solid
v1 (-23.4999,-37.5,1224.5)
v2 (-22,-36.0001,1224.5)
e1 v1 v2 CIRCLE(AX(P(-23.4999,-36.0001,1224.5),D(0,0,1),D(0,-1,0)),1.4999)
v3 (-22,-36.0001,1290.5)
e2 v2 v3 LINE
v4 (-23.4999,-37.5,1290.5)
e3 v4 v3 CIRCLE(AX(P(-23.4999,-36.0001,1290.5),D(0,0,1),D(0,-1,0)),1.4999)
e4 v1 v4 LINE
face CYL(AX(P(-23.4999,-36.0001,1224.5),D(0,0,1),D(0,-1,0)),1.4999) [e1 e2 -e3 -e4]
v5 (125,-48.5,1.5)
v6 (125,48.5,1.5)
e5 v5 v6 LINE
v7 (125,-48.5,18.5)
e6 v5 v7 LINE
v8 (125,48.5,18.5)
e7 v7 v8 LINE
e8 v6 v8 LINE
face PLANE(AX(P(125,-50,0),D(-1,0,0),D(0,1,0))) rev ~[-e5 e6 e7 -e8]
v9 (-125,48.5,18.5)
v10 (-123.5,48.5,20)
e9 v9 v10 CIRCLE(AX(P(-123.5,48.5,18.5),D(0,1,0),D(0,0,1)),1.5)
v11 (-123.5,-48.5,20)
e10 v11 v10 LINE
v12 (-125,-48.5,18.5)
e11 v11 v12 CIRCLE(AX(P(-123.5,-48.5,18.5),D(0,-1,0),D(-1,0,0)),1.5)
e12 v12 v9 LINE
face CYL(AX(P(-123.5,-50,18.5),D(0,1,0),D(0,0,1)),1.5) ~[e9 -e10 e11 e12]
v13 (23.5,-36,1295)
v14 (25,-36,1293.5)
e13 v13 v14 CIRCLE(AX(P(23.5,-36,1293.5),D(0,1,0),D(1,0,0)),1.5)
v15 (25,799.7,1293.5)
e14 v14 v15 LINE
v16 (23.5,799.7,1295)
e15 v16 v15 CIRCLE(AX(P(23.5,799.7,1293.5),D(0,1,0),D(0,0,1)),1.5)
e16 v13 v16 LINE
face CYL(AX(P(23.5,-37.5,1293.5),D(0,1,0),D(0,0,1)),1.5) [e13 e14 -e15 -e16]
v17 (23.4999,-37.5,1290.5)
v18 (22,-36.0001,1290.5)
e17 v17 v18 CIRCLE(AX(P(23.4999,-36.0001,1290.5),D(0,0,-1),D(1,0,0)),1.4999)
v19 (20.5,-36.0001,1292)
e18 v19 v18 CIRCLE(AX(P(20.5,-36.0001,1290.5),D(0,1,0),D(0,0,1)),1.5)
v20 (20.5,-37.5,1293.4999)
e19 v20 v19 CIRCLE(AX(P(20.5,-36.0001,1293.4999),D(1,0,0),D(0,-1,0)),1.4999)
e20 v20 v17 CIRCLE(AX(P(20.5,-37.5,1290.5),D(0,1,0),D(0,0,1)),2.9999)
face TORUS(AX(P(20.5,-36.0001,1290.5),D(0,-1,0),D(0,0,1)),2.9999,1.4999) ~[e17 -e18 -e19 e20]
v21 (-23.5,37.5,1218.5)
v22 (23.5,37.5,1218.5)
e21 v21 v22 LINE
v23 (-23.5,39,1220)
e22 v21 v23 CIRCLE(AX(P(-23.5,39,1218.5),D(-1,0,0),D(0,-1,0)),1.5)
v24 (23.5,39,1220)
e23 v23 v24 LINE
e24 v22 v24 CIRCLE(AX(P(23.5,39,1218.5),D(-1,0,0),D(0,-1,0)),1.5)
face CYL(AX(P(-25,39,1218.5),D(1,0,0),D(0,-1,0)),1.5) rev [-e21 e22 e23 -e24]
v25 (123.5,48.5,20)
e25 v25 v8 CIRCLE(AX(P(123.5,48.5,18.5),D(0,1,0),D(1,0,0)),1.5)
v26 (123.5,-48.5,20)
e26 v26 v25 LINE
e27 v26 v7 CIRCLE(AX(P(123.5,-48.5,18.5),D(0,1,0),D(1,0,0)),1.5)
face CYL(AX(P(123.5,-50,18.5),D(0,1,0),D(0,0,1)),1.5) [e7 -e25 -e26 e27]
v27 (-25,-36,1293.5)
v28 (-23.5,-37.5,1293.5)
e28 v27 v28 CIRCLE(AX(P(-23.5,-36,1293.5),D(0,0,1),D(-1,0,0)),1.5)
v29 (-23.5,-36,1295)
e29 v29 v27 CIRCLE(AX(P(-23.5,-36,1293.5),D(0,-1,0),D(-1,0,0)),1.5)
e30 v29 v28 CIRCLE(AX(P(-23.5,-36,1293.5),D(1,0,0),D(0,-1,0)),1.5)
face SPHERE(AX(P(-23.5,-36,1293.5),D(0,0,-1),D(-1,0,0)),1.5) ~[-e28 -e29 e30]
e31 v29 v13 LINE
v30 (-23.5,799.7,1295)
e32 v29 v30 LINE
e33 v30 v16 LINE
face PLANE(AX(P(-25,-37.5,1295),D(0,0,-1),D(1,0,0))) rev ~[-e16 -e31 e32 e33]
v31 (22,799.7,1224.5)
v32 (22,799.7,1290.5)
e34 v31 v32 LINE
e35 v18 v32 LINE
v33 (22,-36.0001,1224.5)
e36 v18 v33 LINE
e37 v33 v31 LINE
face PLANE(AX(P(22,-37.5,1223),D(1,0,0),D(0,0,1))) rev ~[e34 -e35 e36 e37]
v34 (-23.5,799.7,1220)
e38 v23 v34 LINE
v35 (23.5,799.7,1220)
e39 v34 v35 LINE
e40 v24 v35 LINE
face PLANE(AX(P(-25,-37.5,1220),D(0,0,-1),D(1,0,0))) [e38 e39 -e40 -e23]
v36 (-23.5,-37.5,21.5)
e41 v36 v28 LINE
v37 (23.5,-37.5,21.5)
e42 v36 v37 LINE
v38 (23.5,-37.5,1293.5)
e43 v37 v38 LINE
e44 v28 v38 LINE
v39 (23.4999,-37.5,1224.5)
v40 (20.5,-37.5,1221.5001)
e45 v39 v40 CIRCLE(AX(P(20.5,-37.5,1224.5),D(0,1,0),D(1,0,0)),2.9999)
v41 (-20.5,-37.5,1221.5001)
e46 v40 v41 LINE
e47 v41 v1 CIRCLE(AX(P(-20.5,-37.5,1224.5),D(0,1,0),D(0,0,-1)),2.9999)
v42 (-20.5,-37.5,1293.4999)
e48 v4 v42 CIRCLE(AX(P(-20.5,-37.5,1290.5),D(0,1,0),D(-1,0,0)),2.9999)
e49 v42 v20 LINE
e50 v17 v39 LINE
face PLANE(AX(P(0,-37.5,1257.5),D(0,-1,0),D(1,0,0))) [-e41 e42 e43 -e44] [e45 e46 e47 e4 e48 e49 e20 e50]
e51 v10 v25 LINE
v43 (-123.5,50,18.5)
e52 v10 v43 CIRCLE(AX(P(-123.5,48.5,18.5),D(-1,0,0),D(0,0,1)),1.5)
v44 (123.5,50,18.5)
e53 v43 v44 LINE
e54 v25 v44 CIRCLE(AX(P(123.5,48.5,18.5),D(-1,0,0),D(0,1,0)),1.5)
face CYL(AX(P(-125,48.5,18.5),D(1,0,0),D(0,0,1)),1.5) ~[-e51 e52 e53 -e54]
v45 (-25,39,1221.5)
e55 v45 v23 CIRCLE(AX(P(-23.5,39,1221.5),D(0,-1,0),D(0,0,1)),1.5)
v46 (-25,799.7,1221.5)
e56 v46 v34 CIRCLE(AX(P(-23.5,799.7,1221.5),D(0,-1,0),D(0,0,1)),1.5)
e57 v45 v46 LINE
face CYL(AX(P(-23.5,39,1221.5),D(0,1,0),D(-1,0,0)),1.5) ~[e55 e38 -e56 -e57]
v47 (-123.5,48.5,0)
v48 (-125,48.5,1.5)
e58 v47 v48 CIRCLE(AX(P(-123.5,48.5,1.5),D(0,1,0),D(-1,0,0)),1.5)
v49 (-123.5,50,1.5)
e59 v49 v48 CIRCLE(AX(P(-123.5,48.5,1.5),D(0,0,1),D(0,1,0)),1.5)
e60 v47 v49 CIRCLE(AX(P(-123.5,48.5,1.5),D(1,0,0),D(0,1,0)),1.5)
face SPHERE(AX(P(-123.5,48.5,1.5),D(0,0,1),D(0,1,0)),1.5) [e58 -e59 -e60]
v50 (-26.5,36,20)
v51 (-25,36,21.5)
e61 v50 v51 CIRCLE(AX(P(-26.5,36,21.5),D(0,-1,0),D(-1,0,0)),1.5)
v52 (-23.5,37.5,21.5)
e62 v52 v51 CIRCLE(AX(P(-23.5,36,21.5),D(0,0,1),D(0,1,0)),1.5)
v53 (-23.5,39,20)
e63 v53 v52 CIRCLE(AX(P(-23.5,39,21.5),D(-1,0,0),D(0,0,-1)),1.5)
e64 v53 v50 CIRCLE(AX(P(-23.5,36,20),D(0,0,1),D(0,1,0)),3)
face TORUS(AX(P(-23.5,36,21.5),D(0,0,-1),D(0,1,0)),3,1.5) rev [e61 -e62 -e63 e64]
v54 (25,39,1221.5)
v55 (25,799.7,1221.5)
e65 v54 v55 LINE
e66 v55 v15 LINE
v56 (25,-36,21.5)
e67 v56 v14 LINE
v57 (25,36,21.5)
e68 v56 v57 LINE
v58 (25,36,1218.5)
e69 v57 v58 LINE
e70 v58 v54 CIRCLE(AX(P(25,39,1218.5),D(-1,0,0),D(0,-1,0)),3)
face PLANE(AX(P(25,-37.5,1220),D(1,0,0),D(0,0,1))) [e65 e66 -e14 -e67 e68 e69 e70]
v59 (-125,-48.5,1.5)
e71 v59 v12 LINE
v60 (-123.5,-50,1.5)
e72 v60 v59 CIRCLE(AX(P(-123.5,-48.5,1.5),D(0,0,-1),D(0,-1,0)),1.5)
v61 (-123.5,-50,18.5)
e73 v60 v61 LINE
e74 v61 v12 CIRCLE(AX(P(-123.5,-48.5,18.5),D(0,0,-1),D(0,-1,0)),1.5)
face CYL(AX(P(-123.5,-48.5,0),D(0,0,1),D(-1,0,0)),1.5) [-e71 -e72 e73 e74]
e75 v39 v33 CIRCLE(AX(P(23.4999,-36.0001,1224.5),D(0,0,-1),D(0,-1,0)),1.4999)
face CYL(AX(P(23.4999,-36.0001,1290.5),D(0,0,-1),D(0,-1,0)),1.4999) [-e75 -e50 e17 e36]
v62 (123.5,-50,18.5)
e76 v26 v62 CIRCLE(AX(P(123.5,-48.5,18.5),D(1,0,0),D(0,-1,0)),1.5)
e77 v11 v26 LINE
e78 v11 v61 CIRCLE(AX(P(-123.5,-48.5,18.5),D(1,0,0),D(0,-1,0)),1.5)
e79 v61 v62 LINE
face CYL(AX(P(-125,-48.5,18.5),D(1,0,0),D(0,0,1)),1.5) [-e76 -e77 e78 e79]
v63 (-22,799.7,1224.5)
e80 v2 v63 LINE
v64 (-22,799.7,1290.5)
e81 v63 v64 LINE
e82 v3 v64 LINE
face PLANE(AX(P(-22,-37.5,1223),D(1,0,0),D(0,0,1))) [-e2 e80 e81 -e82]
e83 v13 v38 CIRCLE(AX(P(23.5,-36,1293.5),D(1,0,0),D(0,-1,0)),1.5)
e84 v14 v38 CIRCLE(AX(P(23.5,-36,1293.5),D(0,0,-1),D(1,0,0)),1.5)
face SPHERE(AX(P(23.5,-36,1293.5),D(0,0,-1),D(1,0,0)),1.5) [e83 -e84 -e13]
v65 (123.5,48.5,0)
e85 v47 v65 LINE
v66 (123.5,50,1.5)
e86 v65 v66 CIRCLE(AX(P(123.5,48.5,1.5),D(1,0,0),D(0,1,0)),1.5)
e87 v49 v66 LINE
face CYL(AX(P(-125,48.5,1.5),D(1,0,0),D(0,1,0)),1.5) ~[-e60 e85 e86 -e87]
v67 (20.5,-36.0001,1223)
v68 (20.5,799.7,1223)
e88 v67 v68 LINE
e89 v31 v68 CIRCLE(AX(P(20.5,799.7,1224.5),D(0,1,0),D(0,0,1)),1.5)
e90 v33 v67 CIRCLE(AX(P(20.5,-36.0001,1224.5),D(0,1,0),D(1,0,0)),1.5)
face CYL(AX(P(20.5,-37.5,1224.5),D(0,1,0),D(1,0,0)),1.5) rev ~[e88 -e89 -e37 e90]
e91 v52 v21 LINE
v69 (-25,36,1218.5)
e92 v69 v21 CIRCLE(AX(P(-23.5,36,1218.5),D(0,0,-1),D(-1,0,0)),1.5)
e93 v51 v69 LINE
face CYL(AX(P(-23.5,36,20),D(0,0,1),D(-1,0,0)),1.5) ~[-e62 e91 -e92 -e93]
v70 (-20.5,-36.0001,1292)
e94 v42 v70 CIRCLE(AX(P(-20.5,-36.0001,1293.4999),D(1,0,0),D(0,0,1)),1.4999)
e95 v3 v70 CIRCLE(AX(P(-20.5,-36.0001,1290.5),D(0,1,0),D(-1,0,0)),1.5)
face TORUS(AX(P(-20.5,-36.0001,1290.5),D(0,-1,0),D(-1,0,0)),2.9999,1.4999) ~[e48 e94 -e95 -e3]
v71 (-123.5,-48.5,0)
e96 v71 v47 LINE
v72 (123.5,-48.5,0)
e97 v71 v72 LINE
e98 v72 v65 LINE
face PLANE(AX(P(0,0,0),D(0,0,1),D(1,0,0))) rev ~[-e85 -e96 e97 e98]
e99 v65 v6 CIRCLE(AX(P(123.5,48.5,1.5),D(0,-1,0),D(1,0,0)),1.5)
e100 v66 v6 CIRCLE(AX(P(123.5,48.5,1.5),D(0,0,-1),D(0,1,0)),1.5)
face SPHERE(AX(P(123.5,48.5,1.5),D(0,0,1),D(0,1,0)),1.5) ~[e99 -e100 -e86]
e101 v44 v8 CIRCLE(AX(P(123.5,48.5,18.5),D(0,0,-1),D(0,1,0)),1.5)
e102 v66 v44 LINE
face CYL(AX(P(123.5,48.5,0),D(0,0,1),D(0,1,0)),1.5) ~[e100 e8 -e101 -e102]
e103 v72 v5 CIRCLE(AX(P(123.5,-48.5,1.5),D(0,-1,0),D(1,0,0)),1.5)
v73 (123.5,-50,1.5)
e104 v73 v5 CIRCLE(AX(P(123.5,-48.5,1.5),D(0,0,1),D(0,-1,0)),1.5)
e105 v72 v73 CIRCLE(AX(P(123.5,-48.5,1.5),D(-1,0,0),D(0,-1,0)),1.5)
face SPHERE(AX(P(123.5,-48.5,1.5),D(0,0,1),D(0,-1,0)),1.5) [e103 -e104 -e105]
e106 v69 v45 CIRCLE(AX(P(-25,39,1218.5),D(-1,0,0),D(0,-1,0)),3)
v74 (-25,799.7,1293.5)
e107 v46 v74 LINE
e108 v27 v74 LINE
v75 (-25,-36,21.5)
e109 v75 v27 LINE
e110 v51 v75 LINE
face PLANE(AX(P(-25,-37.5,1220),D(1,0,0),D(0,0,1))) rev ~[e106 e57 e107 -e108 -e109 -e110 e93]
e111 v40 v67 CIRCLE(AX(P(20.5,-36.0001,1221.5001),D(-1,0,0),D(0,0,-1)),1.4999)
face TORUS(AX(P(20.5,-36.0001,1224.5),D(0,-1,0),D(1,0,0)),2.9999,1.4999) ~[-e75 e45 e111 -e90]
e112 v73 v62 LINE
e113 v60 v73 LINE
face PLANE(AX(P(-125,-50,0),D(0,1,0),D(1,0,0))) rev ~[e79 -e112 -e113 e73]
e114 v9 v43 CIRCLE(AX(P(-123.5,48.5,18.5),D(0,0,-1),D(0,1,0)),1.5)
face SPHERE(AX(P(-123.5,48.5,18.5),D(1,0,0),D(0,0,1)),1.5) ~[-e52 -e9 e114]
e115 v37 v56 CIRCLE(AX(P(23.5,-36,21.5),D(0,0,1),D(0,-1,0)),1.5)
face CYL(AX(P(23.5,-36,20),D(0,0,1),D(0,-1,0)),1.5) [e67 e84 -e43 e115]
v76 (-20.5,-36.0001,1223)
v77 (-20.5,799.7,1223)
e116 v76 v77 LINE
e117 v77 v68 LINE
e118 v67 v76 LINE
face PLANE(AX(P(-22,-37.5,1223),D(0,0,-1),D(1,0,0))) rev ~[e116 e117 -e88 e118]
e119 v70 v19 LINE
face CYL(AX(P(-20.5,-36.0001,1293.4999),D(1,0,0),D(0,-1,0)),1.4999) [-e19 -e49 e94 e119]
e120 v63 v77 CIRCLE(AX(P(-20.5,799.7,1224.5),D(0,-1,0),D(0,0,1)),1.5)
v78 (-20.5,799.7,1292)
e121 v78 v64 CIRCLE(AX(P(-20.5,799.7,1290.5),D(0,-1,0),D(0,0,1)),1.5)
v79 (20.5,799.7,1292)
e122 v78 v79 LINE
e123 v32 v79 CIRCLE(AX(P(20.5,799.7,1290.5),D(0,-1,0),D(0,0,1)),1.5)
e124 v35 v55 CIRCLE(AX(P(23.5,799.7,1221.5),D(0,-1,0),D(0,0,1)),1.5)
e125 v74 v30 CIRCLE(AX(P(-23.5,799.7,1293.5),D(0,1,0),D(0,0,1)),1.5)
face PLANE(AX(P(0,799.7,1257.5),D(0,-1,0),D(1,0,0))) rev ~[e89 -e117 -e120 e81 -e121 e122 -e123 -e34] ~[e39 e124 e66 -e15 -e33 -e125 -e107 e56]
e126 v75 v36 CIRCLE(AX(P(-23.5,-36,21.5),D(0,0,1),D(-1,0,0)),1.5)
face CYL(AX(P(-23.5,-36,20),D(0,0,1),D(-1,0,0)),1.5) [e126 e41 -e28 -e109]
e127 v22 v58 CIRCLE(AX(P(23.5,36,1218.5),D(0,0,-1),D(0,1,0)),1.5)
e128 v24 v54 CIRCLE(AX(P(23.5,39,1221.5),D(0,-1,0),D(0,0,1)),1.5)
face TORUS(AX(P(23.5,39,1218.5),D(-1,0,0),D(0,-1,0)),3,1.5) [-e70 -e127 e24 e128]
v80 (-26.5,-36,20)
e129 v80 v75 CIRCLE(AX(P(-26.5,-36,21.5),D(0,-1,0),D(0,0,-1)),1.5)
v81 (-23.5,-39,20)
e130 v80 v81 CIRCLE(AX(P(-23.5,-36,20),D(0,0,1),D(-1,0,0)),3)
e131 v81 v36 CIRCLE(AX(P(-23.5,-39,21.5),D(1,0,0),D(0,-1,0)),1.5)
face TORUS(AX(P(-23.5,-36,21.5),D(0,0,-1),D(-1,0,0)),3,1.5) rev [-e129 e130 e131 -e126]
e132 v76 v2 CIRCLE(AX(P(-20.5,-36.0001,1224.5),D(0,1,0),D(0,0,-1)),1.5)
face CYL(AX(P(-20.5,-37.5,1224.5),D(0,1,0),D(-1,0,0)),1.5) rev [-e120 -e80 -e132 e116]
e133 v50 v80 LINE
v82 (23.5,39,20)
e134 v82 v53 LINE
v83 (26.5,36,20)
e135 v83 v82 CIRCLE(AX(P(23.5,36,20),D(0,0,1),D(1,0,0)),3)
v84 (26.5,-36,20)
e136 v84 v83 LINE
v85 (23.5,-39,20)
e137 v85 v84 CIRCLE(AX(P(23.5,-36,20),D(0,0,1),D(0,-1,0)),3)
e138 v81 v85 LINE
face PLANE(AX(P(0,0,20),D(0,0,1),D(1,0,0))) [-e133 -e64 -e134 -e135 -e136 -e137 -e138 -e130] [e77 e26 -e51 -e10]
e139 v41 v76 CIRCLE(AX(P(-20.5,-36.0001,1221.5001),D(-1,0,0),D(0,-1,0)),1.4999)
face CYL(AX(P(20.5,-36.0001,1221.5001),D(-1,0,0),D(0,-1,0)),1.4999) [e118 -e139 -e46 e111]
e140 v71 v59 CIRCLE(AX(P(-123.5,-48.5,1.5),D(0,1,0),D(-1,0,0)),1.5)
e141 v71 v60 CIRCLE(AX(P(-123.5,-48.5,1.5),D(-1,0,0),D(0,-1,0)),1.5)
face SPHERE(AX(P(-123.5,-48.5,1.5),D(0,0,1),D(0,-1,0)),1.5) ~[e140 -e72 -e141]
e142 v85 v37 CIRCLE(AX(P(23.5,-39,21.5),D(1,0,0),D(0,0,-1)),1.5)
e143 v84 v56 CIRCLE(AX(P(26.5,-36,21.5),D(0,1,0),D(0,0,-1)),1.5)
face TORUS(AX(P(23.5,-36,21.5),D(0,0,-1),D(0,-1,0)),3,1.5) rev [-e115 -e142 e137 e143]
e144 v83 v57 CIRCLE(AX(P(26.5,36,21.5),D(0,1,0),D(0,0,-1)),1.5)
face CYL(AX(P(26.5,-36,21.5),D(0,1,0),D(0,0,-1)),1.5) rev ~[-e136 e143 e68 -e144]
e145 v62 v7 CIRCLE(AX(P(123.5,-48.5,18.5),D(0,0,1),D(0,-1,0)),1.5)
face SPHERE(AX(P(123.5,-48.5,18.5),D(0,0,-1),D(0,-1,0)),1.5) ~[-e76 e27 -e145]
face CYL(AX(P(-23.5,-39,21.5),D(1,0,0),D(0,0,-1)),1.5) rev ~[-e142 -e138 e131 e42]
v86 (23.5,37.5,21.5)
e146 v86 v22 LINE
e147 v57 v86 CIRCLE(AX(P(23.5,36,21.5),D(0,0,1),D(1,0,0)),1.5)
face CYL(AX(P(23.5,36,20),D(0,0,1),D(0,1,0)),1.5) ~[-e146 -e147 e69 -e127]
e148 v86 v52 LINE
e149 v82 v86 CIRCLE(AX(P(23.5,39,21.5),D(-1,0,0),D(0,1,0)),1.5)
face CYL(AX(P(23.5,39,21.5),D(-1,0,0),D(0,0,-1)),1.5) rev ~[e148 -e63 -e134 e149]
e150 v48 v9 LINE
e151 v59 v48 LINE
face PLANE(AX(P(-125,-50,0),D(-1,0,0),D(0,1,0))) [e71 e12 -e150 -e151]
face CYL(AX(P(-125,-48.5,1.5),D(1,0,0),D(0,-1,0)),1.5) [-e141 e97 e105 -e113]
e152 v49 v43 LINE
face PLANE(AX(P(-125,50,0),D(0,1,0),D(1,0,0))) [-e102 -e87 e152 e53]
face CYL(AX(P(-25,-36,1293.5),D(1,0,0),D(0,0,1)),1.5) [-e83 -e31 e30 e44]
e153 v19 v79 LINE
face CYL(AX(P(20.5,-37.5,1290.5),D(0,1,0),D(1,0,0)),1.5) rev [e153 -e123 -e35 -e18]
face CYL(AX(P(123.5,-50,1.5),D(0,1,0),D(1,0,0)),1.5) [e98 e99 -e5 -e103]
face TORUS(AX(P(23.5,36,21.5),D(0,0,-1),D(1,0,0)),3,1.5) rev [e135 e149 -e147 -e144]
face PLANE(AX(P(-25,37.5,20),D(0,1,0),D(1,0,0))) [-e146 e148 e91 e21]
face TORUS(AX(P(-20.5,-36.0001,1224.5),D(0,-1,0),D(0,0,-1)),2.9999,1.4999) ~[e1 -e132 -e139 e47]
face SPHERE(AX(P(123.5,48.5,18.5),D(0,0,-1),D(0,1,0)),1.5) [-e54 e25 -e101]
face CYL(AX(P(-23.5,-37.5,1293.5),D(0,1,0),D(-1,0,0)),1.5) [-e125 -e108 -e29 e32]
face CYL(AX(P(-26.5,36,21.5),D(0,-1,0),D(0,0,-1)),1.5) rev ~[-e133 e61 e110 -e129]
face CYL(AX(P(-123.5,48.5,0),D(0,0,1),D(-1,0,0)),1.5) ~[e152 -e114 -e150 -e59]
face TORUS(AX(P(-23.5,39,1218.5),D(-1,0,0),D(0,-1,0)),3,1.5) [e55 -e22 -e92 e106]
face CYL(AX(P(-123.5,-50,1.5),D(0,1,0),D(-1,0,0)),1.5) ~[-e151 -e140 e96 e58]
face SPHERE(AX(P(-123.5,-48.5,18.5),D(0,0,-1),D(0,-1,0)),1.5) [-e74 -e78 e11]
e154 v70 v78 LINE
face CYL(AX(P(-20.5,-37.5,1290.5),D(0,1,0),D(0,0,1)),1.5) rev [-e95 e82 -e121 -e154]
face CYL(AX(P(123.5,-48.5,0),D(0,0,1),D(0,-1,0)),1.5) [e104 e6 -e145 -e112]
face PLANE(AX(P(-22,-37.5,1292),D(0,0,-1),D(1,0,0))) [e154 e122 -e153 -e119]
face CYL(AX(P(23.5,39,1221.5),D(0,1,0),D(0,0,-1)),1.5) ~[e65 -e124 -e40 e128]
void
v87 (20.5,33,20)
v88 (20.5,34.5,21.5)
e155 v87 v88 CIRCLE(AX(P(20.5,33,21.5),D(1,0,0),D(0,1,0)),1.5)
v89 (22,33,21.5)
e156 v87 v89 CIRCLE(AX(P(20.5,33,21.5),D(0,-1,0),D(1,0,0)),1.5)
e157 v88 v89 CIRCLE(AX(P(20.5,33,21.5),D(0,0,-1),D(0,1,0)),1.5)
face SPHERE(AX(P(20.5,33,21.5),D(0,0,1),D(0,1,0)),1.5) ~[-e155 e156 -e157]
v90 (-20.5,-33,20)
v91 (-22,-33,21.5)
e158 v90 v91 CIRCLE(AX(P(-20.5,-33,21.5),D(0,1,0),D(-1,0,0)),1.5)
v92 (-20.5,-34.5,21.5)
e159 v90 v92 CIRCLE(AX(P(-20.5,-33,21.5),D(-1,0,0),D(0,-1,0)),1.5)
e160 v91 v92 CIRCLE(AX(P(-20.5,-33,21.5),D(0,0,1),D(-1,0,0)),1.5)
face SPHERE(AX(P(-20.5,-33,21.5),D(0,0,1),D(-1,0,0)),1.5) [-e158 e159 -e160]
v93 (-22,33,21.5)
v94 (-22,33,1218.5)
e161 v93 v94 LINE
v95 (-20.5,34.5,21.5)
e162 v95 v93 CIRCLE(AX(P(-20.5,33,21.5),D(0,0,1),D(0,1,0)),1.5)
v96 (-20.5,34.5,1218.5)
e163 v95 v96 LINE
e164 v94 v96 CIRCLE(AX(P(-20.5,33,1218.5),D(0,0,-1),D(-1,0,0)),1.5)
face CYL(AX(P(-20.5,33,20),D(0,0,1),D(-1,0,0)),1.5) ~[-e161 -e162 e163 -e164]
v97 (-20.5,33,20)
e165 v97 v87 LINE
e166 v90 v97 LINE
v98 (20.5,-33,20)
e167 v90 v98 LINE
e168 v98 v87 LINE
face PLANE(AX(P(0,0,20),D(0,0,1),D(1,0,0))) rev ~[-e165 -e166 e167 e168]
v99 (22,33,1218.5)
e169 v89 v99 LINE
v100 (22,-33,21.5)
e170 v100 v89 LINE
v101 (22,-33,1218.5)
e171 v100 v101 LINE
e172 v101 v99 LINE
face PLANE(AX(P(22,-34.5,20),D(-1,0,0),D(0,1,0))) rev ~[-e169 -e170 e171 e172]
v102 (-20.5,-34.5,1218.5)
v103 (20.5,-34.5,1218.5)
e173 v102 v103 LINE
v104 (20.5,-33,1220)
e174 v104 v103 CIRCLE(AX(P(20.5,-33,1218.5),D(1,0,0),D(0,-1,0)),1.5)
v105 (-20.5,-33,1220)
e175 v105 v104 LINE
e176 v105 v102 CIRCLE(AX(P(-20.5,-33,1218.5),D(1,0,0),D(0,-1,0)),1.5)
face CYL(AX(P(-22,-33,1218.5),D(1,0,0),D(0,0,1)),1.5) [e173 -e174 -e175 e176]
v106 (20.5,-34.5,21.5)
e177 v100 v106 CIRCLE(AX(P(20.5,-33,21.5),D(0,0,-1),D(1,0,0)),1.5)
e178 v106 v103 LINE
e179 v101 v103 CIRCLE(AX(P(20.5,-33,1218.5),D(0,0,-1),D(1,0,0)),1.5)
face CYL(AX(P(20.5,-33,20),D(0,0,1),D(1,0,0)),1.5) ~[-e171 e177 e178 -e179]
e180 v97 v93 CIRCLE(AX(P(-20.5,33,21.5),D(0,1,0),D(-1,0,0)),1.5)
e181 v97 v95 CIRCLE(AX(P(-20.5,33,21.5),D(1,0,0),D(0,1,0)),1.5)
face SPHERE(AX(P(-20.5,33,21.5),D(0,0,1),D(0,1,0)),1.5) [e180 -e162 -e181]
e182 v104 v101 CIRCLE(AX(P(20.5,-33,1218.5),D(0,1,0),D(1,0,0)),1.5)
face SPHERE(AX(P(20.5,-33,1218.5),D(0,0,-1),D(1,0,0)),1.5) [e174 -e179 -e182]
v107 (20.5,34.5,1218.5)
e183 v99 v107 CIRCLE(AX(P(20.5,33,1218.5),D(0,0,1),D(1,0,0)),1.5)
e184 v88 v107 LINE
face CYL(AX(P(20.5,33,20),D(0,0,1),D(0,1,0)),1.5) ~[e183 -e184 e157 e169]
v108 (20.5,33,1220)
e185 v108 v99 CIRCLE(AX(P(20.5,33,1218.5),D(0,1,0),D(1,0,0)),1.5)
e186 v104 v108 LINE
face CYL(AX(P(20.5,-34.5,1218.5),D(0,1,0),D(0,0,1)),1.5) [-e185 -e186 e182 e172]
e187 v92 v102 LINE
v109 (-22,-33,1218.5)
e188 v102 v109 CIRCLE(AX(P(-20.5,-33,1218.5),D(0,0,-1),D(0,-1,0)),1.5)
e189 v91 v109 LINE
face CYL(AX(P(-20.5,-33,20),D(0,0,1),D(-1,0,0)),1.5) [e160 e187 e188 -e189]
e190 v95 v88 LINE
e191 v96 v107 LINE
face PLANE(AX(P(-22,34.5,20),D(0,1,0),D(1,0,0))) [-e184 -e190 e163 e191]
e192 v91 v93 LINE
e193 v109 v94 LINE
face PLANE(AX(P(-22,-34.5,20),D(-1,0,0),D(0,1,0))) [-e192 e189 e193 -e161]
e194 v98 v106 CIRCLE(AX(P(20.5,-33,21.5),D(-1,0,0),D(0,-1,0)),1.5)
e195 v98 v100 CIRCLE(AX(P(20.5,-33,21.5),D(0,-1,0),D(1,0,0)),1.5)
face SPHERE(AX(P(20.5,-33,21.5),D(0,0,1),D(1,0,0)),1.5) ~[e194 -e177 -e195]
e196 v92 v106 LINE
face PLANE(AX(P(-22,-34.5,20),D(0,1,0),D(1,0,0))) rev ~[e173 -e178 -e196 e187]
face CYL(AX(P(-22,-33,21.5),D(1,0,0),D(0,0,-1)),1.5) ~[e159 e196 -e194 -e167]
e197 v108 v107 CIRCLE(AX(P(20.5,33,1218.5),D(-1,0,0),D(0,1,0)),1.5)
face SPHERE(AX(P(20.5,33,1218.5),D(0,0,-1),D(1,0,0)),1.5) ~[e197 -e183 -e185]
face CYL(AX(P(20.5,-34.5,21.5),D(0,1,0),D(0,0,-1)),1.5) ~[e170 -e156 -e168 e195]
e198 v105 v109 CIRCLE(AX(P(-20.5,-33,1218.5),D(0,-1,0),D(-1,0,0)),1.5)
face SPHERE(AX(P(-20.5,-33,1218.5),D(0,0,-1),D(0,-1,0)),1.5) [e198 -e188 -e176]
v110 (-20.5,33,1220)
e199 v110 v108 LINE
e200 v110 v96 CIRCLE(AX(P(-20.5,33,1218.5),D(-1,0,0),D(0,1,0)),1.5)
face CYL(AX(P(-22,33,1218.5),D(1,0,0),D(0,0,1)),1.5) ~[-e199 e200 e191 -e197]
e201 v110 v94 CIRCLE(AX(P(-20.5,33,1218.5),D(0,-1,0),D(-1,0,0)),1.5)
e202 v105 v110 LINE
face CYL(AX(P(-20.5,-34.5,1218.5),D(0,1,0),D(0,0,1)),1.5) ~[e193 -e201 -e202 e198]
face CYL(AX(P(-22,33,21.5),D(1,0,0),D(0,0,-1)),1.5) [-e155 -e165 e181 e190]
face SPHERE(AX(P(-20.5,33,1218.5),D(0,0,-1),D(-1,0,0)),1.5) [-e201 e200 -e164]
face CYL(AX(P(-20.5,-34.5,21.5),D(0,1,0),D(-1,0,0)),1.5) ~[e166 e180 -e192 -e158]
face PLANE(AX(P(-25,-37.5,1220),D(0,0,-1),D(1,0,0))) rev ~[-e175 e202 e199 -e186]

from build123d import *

# Parameters (mm, degrees)
F0_W     = 250
F0_H     = 100
F1_DEPTH = 20
F2_W     = 50
F2_H     = 75
F2_W_2   = 44
F2_H_2   = 69
F3_DEPTH = 1200
F4_W     = 50
F4_H     = 75
F4_W_2   = 44
F4_H_2   = 69
F5_DEPTH = 837.2
F6_F1_R  = 1.5
F6_F2_R  = 1.5
F6_F3_R  = 1.5
F6_F4_R  = 1.4999


# Not quite as in the source:
# - a fillet or chamfer is up to 0.001 mm smaller than in the source, because OpenCascade refuses the exact size


with BuildPart() as f1:
    # F0 (on Top) → F1 (new body)
    with BuildSketch(Plane.XY):
        Rectangle(F0_W, F0_H)
    extrude(amount=F1_DEPTH)

    # F2 (on face) → F3 (join)
    with BuildSketch(Plane.XY.offset(20)):
        Rectangle(F2_W, F2_H)
        Rectangle(F2_W_2, F2_H_2, mode=Mode.SUBTRACT)
    extrude(amount=F3_DEPTH)

    # F4 (on face) → F5 (join)
    with BuildSketch(Plane.XZ.offset(37.5)):
        with Locations((0, 1257.5)):
            Rectangle(F4_W, F4_H)
        with Locations((0, 1257.5)):
            Rectangle(F4_W_2, F4_H_2, mode=Mode.SUBTRACT)
    extrude(amount=-F5_DEPTH)

    # F6: fillet of radius 1.5 on 44 edges, made by hand

    # F6_f1
    f6_f1_edges = [f1.edges().sort_by_distance(p)[0] for p in [
        (-22, -34.5, 620),
        (22, 34.5, 620),
        (22, -34.5, 620),
        (-22, 34.5, 620),
        (-22, 381.1, 1292),
        (22, 381.1, 1292),
        (0, 37.5, 1220),
        (22, 381.1, 1223),
        (-22, 381.1, 1223),
        (22, 0, 1220),
        (0, -34.5, 1220),
        (-22, 0, 1220),
        (0, 34.5, 1220),
        (0, 34.5, 20),
        (-22, 0, 20),
        (22, 0, 20),
        (0, -34.5, 20),
    ]]
    fillet(f6_f1_edges, radius=F6_F1_R)

    # F6_f2
    f6_f2_edges = [f1.edges().sort_by_distance(p)[0] for p in [
        (-25, -37.5, 657.5),
        (25, 37.5, 619.25),
        (25, -37.5, 657.5),
        (-25, 37.5, 619.25),
        (25, 381.1, 1295),
        (-25, 381.1, 1295),
        (0, -37.5, 1295),
        (125, -50, 10),
        (-125, -50, 10),
        (125, 50, 10),
        (0, -50, 0),
        (0, -50, 20),
        (0, 50, 20),
        (125, 0, 20),
        (-125, 0, 20),
        (-125, 50, 10),
        (0, 50, 0),
        (125, 0, 0),
        (-125, 0, 0),
        (-25, 37.9393398282, 1219.5606601718),
        (25, 37.9393398282, 1219.5606601718),
    ]]
    fillet(f6_f2_edges, radius=F6_F2_R)

    # F6_f3
    f6_f3_edges = [f1.edges().sort_by_distance(p)[0] for p in [
        (25, 0, 20),
        (-25, 0, 20),
        (0, -37.5, 20),
        (0, 37.5, 20),
        (24.5606601718, 37.0606601718, 20),
        (-24.5606601718, 37.0606601718, 20),
        (-24.5606601718, -37.0606601718, 20),
        (24.5606601718, -37.0606601718, 20),
    ]]
    fillet(f6_f3_edges, radius=F6_F3_R)

    # F6_f4 (radius 1.5 in the source; OpenCascade refuses exactly that, so slightly less here)
    f6_f4_edges = [f1.edges().sort_by_distance(p)[0] for p in [
        (-22, -37.5, 1257.5),
        (0, -37.5, 1223),
        (0, -37.5, 1292),
        (22, -37.5, 1257.5),
        (21.5606601718, -37.5, 1291.5606601718),
        (21.5606601718, -37.5, 1223.4393398282),
        (-21.5606601718, -37.5, 1291.5606601718),
        (-21.5606601718, -37.5, 1223.4393398282),
    ]]
    fillet(f6_f4_edges, radius=F6_F4_R)


solid = f1.part
